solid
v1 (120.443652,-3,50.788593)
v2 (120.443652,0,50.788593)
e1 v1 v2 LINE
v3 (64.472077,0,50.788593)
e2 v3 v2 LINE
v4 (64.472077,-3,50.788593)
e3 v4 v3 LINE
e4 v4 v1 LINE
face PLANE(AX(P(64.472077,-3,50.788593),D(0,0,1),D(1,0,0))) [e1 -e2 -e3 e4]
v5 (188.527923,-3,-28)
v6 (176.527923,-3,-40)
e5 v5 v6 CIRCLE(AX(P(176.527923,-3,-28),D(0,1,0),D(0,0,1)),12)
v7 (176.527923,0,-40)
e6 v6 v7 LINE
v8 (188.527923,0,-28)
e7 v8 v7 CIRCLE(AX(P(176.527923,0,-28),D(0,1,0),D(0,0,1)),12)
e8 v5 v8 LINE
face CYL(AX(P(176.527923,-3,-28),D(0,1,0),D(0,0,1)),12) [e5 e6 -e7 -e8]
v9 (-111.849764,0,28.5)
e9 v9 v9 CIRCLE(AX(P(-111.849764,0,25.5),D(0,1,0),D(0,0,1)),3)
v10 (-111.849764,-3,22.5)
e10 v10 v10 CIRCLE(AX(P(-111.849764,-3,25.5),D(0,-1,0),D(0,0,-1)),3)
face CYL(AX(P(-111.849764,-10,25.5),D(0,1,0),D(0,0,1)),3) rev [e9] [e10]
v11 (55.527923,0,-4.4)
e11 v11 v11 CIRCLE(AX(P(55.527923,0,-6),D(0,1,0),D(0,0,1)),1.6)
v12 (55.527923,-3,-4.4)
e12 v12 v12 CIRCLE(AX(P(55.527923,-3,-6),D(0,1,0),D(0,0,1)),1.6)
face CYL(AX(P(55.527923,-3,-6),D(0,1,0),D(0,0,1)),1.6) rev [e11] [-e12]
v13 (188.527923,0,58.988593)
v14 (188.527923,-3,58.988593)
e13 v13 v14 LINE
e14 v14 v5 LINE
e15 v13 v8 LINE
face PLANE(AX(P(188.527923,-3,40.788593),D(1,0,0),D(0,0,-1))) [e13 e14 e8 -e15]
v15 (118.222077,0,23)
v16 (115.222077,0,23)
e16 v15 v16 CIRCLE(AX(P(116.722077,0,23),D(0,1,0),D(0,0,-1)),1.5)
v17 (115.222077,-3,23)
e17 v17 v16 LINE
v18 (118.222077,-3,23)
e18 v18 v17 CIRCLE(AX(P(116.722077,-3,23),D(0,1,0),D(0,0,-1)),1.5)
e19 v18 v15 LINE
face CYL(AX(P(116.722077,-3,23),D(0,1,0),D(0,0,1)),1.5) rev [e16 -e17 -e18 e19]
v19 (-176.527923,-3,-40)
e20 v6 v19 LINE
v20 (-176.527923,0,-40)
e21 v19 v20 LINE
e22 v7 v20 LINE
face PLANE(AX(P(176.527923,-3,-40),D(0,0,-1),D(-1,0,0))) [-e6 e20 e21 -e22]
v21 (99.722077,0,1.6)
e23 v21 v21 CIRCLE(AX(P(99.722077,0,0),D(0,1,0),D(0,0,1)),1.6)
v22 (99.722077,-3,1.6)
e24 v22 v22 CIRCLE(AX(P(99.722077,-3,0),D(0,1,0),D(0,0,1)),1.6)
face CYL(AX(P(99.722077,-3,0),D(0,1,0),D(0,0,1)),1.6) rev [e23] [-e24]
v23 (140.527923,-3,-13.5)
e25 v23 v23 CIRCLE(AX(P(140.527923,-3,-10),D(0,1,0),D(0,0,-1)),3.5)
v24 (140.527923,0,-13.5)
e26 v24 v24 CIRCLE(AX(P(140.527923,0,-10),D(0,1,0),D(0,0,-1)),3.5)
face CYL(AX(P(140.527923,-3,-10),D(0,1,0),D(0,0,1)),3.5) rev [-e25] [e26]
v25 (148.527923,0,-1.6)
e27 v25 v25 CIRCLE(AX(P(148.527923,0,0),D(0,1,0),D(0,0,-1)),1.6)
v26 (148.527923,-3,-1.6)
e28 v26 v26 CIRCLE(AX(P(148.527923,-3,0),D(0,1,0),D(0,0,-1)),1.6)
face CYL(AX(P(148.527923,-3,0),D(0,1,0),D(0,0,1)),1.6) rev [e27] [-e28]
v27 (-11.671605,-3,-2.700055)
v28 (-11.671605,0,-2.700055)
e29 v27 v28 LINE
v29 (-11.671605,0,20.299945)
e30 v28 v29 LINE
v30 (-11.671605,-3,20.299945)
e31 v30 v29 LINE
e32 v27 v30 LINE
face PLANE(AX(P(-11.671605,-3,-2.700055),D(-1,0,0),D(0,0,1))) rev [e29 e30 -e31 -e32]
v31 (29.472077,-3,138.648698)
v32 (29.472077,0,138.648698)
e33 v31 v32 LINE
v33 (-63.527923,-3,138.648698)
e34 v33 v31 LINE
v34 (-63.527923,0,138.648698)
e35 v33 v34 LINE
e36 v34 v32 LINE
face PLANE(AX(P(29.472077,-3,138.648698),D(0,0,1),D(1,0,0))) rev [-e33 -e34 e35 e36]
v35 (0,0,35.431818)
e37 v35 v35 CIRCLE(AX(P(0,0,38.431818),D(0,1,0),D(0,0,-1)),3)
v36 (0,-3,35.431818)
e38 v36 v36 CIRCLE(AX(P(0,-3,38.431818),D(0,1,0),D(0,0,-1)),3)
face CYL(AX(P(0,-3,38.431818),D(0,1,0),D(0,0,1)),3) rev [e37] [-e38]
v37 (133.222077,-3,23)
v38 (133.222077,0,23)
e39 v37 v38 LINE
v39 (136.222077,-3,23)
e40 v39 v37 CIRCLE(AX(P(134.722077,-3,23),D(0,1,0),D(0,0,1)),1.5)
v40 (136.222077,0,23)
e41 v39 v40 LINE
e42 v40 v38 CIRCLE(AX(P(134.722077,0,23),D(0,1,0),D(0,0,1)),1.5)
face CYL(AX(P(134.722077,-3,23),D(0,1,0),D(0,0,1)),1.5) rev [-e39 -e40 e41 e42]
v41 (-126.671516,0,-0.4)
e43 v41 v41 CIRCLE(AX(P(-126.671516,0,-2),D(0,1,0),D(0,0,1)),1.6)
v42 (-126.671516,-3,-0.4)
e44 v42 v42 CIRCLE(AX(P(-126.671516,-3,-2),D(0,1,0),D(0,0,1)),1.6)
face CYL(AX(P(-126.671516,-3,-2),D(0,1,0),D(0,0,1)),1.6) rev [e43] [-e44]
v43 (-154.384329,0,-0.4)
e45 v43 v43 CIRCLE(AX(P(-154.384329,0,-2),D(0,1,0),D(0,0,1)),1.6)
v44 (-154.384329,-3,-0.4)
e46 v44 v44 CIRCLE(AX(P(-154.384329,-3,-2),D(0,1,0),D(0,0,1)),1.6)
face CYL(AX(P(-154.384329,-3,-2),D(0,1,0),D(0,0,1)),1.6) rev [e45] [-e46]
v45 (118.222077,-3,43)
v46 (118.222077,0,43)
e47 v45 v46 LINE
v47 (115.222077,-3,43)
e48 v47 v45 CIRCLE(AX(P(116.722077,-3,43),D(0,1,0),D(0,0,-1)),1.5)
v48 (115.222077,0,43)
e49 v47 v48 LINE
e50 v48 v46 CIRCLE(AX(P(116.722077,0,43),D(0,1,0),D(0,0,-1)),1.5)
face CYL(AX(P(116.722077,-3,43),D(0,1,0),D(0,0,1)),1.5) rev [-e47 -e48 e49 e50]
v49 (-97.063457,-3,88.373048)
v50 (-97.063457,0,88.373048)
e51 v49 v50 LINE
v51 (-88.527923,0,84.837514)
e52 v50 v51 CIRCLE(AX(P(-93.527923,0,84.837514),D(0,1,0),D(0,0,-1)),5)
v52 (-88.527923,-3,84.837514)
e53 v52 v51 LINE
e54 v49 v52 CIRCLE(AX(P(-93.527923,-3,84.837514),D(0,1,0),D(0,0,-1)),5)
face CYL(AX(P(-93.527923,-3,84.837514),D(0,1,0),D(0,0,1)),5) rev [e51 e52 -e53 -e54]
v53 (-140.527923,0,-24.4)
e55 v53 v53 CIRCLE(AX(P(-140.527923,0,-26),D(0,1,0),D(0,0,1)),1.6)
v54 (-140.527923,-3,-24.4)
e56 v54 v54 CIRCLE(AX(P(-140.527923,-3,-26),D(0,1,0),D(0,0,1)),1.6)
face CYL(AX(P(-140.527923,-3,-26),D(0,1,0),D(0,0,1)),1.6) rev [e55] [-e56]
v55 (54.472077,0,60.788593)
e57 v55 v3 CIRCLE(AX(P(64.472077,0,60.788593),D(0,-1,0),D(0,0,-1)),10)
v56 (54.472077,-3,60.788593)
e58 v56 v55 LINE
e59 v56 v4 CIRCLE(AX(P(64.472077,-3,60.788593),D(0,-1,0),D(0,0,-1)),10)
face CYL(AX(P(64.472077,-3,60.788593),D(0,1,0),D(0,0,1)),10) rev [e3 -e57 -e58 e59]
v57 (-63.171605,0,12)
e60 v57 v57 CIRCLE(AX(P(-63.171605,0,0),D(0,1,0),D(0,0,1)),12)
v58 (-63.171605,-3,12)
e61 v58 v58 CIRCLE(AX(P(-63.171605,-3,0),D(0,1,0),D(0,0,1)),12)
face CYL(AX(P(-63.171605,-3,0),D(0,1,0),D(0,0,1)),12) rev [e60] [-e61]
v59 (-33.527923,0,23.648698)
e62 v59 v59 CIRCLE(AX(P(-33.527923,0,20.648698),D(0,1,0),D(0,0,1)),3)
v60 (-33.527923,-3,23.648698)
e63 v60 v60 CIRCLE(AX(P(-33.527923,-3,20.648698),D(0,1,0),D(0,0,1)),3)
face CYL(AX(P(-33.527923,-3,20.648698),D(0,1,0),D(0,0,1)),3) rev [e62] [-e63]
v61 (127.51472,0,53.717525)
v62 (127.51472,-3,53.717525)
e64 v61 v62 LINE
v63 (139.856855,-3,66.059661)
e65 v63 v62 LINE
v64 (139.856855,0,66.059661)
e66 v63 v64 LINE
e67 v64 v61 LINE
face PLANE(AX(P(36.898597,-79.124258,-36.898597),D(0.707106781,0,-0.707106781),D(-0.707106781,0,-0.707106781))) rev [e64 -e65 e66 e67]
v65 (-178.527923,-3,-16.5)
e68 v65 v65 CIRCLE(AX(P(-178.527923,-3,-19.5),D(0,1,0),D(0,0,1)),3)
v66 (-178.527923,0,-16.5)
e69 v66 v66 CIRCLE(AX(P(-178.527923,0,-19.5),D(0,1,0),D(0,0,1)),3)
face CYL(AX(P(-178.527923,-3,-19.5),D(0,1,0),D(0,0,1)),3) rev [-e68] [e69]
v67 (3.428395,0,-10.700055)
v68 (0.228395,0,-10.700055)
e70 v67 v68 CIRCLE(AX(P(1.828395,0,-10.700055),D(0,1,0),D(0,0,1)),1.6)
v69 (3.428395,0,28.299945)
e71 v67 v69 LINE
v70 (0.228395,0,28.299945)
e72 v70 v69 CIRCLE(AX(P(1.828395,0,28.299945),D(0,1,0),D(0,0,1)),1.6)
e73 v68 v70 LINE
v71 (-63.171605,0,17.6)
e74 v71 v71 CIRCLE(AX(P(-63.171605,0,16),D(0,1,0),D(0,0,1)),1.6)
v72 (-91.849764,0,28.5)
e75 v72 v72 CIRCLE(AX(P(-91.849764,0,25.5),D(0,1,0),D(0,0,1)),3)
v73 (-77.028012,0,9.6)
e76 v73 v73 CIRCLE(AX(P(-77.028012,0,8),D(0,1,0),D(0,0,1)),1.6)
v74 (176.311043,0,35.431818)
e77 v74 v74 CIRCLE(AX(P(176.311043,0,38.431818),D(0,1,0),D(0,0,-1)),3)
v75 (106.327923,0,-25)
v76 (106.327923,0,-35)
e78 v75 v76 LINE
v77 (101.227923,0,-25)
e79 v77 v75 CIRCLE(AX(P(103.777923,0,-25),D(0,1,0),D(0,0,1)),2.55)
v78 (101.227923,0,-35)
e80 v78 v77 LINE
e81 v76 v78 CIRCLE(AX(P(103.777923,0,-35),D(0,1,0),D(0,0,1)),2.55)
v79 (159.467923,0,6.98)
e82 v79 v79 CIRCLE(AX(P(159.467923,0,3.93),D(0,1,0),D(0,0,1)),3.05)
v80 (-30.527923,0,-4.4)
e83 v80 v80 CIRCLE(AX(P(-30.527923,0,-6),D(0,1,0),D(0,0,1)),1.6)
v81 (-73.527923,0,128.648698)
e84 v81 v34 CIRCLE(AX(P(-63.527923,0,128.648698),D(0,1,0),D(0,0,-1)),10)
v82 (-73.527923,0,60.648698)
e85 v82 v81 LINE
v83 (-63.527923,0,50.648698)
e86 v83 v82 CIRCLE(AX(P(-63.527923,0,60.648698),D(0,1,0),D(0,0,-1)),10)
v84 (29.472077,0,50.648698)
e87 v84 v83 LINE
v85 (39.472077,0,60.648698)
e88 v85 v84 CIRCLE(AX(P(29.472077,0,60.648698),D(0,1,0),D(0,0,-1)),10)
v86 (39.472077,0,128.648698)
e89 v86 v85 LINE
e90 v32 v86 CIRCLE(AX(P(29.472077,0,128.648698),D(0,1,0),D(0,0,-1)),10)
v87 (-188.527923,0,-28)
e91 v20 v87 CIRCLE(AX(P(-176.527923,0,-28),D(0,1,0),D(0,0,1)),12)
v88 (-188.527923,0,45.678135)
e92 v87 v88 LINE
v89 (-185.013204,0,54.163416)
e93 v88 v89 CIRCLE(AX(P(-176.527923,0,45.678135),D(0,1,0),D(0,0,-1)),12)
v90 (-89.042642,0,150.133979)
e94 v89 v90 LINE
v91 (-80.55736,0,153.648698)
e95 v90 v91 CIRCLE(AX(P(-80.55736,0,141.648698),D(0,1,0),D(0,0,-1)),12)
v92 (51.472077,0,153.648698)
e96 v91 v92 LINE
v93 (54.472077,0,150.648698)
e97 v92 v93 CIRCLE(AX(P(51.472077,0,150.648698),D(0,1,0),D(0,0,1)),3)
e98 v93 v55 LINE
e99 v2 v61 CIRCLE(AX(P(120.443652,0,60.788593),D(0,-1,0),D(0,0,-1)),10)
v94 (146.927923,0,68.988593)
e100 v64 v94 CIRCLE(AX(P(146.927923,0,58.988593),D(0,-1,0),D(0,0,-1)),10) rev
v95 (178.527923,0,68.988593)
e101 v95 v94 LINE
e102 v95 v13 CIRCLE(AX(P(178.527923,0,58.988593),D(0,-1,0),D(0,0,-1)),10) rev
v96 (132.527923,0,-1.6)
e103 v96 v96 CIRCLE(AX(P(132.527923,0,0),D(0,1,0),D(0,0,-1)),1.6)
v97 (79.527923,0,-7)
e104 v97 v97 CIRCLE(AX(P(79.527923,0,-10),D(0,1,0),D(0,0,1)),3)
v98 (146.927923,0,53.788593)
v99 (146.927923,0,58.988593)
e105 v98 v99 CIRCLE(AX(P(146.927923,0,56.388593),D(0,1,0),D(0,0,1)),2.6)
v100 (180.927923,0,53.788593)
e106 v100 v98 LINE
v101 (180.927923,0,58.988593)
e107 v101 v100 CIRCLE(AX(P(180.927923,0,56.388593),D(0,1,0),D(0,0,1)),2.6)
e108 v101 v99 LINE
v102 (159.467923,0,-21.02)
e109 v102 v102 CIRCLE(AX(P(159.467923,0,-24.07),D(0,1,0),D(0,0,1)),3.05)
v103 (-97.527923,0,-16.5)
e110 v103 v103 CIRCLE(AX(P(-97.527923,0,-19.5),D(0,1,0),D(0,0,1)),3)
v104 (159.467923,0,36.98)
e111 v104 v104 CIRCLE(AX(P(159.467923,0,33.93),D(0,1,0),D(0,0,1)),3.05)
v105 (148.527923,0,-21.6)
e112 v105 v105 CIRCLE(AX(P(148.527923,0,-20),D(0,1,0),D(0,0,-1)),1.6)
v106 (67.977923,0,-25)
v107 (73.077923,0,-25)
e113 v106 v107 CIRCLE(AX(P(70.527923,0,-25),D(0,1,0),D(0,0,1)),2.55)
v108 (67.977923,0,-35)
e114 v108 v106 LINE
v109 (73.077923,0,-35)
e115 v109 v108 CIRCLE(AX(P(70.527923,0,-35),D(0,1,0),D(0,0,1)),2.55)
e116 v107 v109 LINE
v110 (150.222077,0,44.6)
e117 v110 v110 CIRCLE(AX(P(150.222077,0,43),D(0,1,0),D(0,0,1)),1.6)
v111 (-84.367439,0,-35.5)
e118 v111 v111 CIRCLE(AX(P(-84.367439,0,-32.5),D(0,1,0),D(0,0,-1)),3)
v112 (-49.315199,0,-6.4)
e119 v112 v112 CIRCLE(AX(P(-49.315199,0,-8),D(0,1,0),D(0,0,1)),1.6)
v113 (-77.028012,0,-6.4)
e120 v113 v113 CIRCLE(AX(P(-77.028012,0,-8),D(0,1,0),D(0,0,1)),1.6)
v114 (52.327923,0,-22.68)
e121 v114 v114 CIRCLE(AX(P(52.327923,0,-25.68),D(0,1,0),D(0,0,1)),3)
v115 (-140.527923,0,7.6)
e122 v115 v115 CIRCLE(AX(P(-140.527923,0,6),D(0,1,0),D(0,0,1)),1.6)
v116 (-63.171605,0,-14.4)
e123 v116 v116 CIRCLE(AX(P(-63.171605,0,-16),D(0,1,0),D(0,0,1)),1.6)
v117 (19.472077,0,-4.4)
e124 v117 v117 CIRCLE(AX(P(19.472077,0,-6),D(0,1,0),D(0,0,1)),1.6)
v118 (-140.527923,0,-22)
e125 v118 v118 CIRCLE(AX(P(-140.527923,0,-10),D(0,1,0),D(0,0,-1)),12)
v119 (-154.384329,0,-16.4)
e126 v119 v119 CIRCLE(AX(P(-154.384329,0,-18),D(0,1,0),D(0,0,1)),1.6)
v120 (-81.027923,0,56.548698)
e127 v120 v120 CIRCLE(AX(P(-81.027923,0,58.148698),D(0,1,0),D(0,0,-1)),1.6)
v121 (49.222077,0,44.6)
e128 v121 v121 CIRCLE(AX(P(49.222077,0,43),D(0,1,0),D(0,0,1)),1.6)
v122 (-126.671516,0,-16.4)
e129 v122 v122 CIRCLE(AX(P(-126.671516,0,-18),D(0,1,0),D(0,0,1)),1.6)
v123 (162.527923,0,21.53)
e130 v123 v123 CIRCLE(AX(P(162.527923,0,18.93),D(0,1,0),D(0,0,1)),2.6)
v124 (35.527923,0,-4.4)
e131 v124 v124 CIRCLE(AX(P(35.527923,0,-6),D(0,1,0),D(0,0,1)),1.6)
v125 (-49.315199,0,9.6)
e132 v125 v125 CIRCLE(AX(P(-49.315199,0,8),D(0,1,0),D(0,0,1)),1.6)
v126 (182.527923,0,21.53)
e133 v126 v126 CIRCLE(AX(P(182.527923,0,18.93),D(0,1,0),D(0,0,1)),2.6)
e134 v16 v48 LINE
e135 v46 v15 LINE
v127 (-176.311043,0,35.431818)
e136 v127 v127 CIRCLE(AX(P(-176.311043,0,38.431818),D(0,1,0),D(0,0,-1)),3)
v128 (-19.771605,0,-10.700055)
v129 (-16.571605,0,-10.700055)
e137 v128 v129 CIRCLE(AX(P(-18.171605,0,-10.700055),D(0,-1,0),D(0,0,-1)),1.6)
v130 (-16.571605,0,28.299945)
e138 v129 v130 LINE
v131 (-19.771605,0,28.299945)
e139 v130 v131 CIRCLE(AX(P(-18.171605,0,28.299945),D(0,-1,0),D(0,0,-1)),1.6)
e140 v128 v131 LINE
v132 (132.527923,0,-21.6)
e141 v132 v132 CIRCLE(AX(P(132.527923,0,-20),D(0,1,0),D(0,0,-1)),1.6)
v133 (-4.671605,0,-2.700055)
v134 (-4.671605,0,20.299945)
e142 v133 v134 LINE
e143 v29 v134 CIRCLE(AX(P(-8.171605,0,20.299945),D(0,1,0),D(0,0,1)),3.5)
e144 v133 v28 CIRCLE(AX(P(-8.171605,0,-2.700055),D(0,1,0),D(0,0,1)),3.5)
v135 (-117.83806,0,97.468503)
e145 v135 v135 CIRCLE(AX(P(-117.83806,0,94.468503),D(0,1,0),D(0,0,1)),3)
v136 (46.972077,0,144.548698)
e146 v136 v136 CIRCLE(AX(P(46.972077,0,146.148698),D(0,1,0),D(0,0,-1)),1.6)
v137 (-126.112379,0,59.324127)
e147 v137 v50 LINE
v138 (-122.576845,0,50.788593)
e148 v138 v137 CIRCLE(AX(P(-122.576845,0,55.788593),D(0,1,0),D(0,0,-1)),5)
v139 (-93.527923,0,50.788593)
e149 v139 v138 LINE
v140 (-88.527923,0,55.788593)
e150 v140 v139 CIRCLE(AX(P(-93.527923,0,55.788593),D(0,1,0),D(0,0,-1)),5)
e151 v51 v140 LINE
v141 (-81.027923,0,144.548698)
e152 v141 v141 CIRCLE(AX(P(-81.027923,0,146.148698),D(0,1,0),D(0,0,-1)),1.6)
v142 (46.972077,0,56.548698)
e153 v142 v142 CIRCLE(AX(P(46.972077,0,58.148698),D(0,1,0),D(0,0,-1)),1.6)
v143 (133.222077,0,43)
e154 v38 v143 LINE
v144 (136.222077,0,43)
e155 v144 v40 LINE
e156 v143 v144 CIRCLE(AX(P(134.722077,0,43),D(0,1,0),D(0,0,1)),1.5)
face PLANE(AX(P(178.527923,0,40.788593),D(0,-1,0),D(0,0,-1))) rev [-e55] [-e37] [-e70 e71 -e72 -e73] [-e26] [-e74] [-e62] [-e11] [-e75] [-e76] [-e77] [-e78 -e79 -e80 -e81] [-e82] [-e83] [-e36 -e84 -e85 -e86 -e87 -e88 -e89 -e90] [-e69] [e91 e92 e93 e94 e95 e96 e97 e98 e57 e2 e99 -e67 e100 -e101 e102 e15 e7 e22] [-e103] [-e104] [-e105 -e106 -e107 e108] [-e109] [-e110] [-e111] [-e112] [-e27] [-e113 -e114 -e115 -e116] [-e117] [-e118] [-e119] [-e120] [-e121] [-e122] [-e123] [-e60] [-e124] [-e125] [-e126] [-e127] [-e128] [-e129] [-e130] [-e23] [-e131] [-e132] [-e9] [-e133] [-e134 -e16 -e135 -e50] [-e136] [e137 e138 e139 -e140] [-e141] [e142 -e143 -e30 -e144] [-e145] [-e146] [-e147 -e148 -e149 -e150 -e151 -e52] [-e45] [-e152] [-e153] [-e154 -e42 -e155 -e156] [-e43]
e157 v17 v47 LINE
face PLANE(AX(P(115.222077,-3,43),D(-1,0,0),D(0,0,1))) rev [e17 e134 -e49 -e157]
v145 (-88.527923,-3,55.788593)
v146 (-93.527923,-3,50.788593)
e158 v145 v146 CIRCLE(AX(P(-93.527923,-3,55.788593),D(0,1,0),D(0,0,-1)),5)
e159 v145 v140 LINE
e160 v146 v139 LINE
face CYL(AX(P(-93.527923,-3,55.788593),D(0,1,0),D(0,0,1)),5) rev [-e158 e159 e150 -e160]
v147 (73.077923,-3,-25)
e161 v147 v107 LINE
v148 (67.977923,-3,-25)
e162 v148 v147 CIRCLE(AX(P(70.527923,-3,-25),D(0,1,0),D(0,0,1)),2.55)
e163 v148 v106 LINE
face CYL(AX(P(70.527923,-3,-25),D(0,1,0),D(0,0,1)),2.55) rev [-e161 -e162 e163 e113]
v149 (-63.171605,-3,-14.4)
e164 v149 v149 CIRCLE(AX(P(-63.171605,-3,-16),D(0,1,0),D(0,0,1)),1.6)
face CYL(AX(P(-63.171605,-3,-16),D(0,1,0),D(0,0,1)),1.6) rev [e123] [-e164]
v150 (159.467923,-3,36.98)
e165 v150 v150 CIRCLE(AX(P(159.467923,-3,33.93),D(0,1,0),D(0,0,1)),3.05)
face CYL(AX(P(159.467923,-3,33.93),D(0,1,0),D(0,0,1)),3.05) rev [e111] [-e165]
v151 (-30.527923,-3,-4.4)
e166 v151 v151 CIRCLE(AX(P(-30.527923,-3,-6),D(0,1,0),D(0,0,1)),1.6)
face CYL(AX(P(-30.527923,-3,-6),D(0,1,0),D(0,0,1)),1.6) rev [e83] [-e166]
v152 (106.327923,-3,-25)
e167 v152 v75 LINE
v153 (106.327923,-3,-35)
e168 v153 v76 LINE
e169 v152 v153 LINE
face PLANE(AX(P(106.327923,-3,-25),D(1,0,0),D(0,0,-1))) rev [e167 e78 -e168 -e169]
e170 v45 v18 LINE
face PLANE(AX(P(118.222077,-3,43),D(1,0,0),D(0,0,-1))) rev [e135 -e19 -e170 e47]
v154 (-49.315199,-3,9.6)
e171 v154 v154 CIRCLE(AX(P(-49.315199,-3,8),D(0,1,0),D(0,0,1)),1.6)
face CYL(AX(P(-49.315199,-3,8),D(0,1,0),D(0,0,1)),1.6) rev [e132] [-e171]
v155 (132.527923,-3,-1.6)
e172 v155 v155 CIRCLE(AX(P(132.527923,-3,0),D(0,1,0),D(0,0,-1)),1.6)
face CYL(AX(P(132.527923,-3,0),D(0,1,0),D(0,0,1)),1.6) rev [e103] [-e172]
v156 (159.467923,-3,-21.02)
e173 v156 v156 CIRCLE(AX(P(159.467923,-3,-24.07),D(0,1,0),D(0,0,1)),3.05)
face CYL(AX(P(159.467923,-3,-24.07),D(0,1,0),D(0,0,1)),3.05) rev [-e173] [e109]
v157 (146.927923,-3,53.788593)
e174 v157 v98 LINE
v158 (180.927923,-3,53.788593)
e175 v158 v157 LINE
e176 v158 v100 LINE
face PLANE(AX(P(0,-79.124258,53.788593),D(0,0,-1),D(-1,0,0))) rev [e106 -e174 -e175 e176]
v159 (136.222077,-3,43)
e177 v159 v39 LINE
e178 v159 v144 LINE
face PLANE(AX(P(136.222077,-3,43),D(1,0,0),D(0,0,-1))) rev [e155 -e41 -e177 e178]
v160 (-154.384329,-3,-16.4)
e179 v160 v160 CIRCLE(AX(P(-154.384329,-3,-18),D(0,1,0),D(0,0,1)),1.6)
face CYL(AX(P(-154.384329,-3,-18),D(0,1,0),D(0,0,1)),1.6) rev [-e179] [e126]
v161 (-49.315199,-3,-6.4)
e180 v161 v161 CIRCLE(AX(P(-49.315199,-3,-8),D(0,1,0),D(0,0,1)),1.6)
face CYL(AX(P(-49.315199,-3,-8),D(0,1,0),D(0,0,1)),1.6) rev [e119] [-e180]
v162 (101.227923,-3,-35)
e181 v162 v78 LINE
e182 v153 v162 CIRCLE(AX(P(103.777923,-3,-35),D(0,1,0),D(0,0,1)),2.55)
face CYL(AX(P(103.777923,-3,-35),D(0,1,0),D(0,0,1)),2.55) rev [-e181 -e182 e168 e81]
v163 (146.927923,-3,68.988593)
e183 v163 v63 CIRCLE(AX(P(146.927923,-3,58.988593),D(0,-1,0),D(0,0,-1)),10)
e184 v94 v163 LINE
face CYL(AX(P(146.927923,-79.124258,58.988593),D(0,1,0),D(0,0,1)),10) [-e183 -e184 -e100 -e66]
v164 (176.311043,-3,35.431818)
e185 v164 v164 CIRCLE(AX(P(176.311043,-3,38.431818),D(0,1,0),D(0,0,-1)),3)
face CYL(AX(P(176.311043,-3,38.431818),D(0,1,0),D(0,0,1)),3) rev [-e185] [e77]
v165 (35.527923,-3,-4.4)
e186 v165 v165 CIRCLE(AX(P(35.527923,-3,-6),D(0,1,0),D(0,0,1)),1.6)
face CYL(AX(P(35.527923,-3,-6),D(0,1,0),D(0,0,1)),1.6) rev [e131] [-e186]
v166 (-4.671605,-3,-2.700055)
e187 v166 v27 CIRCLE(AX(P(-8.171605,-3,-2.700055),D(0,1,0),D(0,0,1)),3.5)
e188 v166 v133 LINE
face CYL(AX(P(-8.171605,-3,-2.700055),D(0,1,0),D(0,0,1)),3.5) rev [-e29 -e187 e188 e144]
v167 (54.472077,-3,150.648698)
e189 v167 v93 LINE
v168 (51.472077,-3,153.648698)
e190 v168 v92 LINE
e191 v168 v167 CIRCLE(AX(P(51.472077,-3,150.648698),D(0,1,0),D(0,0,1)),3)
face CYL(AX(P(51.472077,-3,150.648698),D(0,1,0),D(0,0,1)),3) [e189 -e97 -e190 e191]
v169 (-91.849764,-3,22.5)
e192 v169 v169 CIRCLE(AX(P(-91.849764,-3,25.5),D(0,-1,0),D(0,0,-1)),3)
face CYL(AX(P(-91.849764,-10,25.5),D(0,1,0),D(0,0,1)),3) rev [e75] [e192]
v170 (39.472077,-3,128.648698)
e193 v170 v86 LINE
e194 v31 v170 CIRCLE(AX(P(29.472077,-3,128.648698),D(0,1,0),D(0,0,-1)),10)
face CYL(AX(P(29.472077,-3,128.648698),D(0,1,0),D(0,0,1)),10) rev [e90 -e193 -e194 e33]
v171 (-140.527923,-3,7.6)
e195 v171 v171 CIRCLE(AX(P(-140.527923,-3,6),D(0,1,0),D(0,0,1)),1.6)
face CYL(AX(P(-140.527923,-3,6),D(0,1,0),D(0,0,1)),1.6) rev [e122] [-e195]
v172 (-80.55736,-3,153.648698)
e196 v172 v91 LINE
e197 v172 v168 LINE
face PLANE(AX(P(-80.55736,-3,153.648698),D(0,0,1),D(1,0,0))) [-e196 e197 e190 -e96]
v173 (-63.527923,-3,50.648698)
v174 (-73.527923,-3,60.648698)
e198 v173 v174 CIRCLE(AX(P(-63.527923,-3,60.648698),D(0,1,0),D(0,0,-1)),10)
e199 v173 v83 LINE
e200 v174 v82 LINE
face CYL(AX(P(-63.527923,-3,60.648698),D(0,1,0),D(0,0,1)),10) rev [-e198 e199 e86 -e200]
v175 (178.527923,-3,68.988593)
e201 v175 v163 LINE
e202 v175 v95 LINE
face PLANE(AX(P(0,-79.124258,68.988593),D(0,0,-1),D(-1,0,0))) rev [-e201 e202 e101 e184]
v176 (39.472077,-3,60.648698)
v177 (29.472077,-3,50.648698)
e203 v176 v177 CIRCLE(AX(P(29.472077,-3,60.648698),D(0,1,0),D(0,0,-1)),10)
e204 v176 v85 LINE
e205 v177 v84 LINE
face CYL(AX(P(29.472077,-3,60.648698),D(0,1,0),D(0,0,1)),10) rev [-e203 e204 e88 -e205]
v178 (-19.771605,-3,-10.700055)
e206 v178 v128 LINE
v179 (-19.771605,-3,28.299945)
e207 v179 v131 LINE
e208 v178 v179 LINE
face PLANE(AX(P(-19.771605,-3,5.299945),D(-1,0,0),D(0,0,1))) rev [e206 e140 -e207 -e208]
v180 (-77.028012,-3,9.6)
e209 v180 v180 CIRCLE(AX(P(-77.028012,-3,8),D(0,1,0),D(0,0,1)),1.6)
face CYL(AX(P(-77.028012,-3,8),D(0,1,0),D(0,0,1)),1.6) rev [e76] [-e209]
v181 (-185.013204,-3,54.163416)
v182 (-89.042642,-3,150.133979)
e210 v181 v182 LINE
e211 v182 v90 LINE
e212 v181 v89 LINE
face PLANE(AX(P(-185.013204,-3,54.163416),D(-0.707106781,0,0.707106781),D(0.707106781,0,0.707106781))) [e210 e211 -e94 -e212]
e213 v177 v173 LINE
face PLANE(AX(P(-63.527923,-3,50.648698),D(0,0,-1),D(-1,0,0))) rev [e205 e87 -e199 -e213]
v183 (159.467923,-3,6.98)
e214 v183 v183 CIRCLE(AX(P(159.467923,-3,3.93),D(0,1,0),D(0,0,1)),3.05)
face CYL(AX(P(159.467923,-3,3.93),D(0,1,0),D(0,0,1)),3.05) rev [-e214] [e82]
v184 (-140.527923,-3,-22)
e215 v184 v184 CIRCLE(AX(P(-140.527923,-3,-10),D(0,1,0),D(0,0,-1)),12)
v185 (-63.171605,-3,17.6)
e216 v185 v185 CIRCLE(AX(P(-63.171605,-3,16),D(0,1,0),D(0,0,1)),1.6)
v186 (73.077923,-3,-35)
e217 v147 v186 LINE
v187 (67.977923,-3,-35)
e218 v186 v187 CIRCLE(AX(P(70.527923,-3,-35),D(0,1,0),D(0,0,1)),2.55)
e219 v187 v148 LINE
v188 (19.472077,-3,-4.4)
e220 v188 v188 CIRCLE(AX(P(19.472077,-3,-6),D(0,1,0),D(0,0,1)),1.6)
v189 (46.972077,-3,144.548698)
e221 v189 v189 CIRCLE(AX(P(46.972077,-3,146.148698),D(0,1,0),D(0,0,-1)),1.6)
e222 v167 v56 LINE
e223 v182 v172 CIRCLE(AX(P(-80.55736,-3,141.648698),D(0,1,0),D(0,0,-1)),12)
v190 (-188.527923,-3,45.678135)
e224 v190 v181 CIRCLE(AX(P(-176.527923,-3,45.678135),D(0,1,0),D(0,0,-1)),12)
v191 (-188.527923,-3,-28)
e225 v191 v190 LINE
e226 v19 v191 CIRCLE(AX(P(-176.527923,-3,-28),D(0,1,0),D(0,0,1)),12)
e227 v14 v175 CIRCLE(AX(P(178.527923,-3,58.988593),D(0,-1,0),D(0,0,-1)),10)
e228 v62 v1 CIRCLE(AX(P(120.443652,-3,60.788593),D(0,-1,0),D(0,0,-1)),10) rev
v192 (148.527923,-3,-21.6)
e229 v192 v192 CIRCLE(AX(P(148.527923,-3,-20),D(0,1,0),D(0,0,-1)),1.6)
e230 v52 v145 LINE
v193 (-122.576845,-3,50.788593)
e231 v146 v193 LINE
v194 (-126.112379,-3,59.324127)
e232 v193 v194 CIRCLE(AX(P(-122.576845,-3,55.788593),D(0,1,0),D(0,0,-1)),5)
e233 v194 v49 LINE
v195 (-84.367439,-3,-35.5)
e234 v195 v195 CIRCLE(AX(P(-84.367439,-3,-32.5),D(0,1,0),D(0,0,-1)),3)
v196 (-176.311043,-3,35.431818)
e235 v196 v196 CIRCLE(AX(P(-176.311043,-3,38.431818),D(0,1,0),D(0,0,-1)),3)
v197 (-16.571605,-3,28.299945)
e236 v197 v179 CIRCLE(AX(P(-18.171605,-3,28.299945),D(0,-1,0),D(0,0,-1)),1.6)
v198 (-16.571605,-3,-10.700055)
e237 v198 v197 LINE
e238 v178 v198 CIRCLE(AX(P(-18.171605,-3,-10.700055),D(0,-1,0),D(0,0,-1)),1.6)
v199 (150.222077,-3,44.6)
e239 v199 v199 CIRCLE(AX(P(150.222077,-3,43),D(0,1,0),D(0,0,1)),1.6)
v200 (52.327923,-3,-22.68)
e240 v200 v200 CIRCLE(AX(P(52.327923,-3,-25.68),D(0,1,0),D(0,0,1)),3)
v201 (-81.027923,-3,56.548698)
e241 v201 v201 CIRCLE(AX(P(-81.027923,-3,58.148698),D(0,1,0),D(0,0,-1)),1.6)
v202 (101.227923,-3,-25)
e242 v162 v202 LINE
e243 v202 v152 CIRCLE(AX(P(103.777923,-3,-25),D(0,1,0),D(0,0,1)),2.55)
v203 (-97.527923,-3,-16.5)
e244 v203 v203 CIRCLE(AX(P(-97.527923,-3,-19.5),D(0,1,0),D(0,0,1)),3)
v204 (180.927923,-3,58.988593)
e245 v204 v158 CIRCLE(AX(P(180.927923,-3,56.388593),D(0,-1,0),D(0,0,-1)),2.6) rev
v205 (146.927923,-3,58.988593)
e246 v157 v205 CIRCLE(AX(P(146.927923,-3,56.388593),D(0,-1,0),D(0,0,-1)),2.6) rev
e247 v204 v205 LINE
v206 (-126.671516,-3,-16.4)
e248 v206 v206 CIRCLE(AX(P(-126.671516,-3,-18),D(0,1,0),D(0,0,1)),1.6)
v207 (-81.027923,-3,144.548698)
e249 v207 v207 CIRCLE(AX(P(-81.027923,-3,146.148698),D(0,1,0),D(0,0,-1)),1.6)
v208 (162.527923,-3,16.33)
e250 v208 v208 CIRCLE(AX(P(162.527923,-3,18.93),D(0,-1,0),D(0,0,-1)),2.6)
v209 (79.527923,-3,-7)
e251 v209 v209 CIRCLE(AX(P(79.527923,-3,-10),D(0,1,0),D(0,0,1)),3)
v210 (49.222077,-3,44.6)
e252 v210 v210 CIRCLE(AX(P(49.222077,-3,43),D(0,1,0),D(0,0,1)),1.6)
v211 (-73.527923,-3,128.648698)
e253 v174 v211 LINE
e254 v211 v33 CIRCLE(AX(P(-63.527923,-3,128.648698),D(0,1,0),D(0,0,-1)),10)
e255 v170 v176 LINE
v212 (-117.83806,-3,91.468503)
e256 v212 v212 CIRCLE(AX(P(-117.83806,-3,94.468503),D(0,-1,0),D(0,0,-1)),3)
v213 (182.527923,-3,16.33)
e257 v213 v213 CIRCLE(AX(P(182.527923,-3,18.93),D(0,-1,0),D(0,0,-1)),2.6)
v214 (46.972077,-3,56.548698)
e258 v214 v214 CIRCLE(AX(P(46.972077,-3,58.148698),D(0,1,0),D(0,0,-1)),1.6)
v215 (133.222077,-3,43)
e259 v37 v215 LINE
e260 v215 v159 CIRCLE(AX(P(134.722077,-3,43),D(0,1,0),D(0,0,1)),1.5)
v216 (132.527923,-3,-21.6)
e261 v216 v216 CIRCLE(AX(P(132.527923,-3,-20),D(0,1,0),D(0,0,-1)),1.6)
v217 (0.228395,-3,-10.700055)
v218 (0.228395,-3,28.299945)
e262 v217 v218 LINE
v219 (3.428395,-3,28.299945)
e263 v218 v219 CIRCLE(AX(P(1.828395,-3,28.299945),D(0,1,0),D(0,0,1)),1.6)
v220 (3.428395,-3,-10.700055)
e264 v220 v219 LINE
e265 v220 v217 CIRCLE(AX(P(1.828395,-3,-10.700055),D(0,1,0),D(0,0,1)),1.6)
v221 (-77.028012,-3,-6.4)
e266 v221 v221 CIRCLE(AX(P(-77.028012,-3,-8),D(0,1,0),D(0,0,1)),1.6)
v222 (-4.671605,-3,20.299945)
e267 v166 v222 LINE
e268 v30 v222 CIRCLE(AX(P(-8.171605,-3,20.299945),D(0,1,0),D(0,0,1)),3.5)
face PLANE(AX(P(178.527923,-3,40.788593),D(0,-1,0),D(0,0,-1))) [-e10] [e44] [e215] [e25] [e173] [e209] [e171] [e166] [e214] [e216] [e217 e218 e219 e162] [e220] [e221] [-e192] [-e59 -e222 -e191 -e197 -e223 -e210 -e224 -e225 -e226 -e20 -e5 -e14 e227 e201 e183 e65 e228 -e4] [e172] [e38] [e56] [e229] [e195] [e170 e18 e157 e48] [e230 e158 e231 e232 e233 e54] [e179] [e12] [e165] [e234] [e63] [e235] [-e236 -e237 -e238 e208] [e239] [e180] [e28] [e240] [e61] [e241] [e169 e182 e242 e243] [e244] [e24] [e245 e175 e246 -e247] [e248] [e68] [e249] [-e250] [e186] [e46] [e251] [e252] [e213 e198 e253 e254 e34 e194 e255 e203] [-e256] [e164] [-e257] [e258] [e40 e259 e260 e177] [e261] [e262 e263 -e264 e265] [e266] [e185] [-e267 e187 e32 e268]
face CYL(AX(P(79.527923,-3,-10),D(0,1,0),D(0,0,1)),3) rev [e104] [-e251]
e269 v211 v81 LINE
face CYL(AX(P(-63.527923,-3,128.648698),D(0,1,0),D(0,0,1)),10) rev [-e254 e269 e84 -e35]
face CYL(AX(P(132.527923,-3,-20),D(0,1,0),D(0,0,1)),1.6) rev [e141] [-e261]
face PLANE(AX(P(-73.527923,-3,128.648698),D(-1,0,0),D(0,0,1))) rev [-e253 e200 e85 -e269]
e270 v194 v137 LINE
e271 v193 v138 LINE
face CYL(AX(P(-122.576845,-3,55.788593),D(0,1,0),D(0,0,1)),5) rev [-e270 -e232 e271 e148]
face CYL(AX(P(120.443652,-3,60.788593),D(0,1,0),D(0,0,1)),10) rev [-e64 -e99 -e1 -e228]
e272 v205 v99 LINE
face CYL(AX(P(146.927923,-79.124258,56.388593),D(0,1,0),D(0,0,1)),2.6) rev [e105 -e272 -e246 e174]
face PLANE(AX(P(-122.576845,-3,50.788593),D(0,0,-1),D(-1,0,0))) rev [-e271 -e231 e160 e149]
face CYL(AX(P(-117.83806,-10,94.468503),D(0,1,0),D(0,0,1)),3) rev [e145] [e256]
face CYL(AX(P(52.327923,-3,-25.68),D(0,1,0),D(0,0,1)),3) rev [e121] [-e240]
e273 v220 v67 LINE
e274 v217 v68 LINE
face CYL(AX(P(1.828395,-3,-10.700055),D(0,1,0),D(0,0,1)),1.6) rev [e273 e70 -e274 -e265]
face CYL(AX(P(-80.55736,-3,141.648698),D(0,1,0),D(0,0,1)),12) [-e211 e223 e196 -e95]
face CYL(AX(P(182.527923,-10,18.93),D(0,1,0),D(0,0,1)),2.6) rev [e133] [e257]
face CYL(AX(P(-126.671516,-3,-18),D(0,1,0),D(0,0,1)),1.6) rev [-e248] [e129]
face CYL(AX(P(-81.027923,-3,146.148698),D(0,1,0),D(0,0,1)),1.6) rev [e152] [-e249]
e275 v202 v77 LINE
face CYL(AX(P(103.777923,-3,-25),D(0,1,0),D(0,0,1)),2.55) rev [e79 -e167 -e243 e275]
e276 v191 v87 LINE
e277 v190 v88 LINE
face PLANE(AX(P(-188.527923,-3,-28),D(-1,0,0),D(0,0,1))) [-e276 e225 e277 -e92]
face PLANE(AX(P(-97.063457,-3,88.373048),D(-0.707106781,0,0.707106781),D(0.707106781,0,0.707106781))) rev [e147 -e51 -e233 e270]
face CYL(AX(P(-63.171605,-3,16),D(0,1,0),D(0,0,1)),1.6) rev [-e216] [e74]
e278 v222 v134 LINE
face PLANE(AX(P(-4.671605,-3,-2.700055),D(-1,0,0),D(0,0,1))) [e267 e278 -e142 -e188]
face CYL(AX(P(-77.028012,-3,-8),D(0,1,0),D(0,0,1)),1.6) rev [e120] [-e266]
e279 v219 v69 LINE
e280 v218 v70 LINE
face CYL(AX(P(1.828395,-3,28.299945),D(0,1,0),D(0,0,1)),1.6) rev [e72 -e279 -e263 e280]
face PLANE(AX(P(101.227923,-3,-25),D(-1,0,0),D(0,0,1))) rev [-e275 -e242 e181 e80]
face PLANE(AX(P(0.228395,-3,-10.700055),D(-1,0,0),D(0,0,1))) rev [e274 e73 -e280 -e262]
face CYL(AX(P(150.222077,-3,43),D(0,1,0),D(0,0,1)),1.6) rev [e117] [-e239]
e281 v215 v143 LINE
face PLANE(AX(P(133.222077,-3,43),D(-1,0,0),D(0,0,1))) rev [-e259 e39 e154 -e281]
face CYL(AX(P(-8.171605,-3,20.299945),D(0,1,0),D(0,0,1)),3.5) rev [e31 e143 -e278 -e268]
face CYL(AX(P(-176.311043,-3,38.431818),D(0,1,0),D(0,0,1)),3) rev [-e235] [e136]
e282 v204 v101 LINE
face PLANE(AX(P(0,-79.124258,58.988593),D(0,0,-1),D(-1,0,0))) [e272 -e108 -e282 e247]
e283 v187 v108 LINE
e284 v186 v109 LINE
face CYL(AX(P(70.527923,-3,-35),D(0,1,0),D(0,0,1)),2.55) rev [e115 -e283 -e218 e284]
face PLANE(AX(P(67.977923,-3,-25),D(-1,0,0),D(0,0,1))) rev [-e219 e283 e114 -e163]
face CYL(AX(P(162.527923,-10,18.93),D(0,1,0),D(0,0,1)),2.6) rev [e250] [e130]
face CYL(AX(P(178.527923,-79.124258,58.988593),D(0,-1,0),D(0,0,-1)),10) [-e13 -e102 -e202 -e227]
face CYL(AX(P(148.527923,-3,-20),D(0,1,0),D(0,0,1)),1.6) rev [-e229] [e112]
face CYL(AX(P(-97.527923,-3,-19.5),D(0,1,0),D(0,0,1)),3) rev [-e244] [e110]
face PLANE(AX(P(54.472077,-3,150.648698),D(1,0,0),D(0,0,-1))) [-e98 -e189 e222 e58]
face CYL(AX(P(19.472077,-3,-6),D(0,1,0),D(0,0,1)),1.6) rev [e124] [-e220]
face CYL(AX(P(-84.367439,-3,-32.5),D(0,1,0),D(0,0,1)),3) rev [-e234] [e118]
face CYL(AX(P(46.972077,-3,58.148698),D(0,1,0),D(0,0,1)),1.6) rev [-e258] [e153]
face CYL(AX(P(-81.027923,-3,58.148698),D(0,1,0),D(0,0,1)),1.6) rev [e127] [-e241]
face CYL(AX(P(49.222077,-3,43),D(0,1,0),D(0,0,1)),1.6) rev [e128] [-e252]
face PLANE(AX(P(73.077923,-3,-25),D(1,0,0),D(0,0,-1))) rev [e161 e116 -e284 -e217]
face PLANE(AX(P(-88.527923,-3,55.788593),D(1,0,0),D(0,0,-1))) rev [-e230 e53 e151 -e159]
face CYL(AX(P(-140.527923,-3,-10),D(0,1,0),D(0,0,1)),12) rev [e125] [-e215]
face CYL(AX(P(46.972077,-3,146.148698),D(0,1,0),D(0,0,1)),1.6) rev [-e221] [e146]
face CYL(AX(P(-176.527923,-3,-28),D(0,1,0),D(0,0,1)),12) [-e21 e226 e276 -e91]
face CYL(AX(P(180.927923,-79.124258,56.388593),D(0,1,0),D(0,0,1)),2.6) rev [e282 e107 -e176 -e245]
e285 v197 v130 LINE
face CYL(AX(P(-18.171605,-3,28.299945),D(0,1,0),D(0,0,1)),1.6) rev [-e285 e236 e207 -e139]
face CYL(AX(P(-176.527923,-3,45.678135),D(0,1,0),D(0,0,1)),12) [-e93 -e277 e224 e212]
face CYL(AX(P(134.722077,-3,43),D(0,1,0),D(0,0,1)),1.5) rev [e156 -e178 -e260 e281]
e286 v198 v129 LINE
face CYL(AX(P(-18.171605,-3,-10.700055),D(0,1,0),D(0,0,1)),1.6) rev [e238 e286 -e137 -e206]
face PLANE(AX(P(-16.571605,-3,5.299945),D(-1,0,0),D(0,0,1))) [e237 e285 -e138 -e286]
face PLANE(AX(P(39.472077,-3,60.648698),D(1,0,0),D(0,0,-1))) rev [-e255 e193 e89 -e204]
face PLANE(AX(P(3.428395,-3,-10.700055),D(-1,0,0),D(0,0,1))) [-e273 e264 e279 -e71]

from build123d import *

# Parameters (mm, degrees)
ESBO_O1_R                = 1.6
ESBO_O1_R_2              = 3
ESBO_O1_R_3              = 12
ESBO_O1_R_4              = 3.5
ESBO_O1_R_5              = 3.05
RESSALTO_EXTRUS_O1_DEPTH = 3
ESBO_O2_R                = 3
ESBO_O2_R_2              = 2.6
CORTE_EXTRUS_O1_DEPTH    = 10
RESSALTO_EXTRUS_O2_START = -3
RESSALTO_EXTRUS_O2_DEPTH = 3
FILETE1_R                = 10
CORTE_EXTRUS_O2_DEPTH    = 244.227671166


# Read off the part's stored shape, not the designer's step: Ressalto-extrusão2
with BuildPart() as part:
    # Esboço1 → Ressalto-extrusão1 (new body)
    with BuildSketch(Plane(origin=(0, 0, 0), x_dir=(1, 0, 0), z_dir=(0, 1, 0))):
        with BuildLine():
            Line((-80.557360207, -153.648697641), (51.472077044, -153.648697641))
            ThreePointArc((51.472077044, -153.648697641), (53.593397388, -152.770017984), (54.472077044, -150.648697641))
            Line((54.472077044, -150.648697641), (54.472077044, -60.788592817))
            ThreePointArc((54.472077044, -60.788592817), (57.401009232, -53.717525005), (64.472077044, -50.788592817))
            Line((64.472077044, -50.788592817), (178.527922956, -50.788592817))
            ThreePointArc((178.527922956, -50.788592817), (185.598990768, -47.859660628), (188.527922956, -40.788592817))
            Line((188.527922956, -40.788592817), (188.527922956, 28))
            ThreePointArc((188.527922956, 28), (185.01320433, 36.485281374), (176.527922956, 40))
            Line((176.527922956, 40), (-176.527922956, 40))
            ThreePointArc((-176.527922956, 40), (-185.01320433, 36.485281374), (-188.527922956, 28))
            Line((-188.527922956, 28), (-188.527922956, -45.678134892))
            ThreePointArc((-188.527922956, -45.678134892), (-187.614477346, -50.270336081), (-185.01320433, -54.163416267))
            Line((-185.01320433, -54.163416267), (-89.042641582, -150.133979015))
            ThreePointArc((-89.042641582, -150.133979015), (-85.149561396, -152.735252031), (-80.557360207, -153.648697641))
        make_face()
        with Locations(Location((-81.027922956, -58.148697641, 0), (0, 0, 90))):
            Circle(ESBO_O1_R, mode=Mode.SUBTRACT)
        with Locations(Location((-81.027922956, -146.148697641, 0), (0, 0, 90))):
            Circle(ESBO_O1_R, mode=Mode.SUBTRACT)
        with Locations(Location((46.972077044, -58.148697641, 0), (0, 0, 90))):
            Circle(ESBO_O1_R, mode=Mode.SUBTRACT)
        with Locations(Location((46.972077044, -146.148697641, 0), (0, 0, 90))):
            Circle(ESBO_O1_R, mode=Mode.SUBTRACT)
        with Locations(Location((176.311042956, -38.431817641, 0), (0, 0, 90))):
            Circle(ESBO_O1_R_2, mode=Mode.SUBTRACT)
        with Locations(Location((0, -38.431817641, 0), (0, 0, 90))):
            Circle(ESBO_O1_R_2, mode=Mode.SUBTRACT)
        with Locations(Location((-140.527922956, 10, 0), (0, 0, 90))):
            Circle(ESBO_O1_R_3, mode=Mode.SUBTRACT)
        with Locations(Location((-140.527922956, -6, 0), (0, 0, 270))):
            Circle(ESBO_O1_R, mode=Mode.SUBTRACT)
        with Locations(Location((-154.384329416, 2, 0), (0, 0, 270))):
            Circle(ESBO_O1_R, mode=Mode.SUBTRACT)
        with Locations(Location((-154.384329416, 18, 0), (0, 0, 270))):
            Circle(ESBO_O1_R, mode=Mode.SUBTRACT)
        with Locations(Location((-84.367438628, 32.5, 0), (0, 0, 90))):
            Circle(ESBO_O1_R_2, mode=Mode.SUBTRACT)
        with Locations(Location((-176.311042956, -38.431817641, 0), (0, 0, 90))):
            Circle(ESBO_O1_R_2, mode=Mode.SUBTRACT)
        with Locations(Location((140.527922956, 10, 0), (0, 0, 90))):
            Circle(ESBO_O1_R_4, mode=Mode.SUBTRACT)
        with Locations(Location((148.527922956, 0, 0), (0, 0, 90))):
            Circle(ESBO_O1_R, mode=Mode.SUBTRACT)
        with Locations(Location((148.527922956, 20, 0), (0, 0, 90))):
            Circle(ESBO_O1_R, mode=Mode.SUBTRACT)
        with Locations(Location((132.527922956, 0, 0), (0, 0, 90))):
            Circle(ESBO_O1_R, mode=Mode.SUBTRACT)
        with Locations(Location((132.527922956, 20, 0), (0, 0, 90))):
            Circle(ESBO_O1_R, mode=Mode.SUBTRACT)
        with Locations(Location((-140.527922956, 26, 0), (0, 0, 270))):
            Circle(ESBO_O1_R, mode=Mode.SUBTRACT)
        with Locations(Location((-126.671516495, 18, 0), (0, 0, 270))):
            Circle(ESBO_O1_R, mode=Mode.SUBTRACT)
        with Locations(Location((-126.671516495, 2, 0), (0, 0, 270))):
            Circle(ESBO_O1_R, mode=Mode.SUBTRACT)
        with Locations(Location((-63.17160518, -16, 0), (0, 0, 270))):
            Circle(ESBO_O1_R, mode=Mode.SUBTRACT)
        with Locations(Location((-77.02801164, -8, 0), (0, 0, 270))):
            Circle(ESBO_O1_R, mode=Mode.SUBTRACT)
        with Locations(Location((-77.02801164, 8, 0), (0, 0, 270))):
            Circle(ESBO_O1_R, mode=Mode.SUBTRACT)
        with Locations(Location((-63.17160518, 16, 0), (0, 0, 270))):
            Circle(ESBO_O1_R, mode=Mode.SUBTRACT)
        with Locations(Location((-49.315198719, 8, 0), (0, 0, 270))):
            Circle(ESBO_O1_R, mode=Mode.SUBTRACT)
        with Locations(Location((-49.315198719, -8, 0), (0, 0, 270))):
            Circle(ESBO_O1_R, mode=Mode.SUBTRACT)
        with Locations(Location((-63.17160518, 0, 0), (0, 0, 270))):
            Circle(ESBO_O1_R_3, mode=Mode.SUBTRACT)
        with Locations(Location((-33.527922956, -20.648697641, 0), (0, 0, 270))):
            Circle(ESBO_O1_R_2, mode=Mode.SUBTRACT)
        with Locations(Location((79.527922956, 10, 0), (0, 0, 270))):
            Circle(ESBO_O1_R_2, mode=Mode.SUBTRACT)
        with Locations(Location((99.722077044, 0, 0), (0, 0, 270))):
            Circle(ESBO_O1_R, mode=Mode.SUBTRACT)
        with Locations(Location((49.222077044, -43, 0), (0, 0, 270))):
            Circle(ESBO_O1_R, mode=Mode.SUBTRACT)
        with Locations(Location((-30.527922956, 6, 0), (0, 0, 270))):
            Circle(ESBO_O1_R, mode=Mode.SUBTRACT)
        with Locations(Location((19.472077044, 6, 0), (0, 0, 270))):
            Circle(ESBO_O1_R, mode=Mode.SUBTRACT)
        with Locations(Location((55.527922956, 6, 0), (0, 0, 270))):
            Circle(ESBO_O1_R, mode=Mode.SUBTRACT)
        with Locations(Location((35.527922956, 6, 0), (0, 0, 270))):
            Circle(ESBO_O1_R, mode=Mode.SUBTRACT)
        with Locations(Location((159.467922956, 24.07, 0), (0, 0, 270))):
            Circle(ESBO_O1_R_5, mode=Mode.SUBTRACT)
        with Locations(Location((159.467922956, -3.93, 0), (0, 0, 270))):
            Circle(ESBO_O1_R_5, mode=Mode.SUBTRACT)
        with Locations(Location((159.467922956, -33.93, 0), (0, 0, 270))):
            Circle(ESBO_O1_R_5, mode=Mode.SUBTRACT)
        with Locations(Location((-178.527922956, 19.5, 0), (0, 0, 270))):
            Circle(ESBO_O1_R_2, mode=Mode.SUBTRACT)
        with Locations(Location((-97.527922956, 19.5, 0), (0, 0, 270))):
            Circle(ESBO_O1_R_2, mode=Mode.SUBTRACT)
        with Locations(Location((52.327922956, 25.68, 0), (0, 0, 270))):
            Circle(ESBO_O1_R_2, mode=Mode.SUBTRACT)
        with Locations(Location((150.222077044, -43, 0), (0, 0, 270))):
            Circle(ESBO_O1_R, mode=Mode.SUBTRACT)
        with BuildLine():
            Line((-122.576844598, -50.788592817), (-93.527922956, -50.788592817))
            ThreePointArc((-93.527922956, -50.788592817), (-89.99238905, -52.253058911), (-88.527922956, -55.788592817))
            Line((-88.527922956, -55.788592817), (-88.527922956, -84.837514459))
            ThreePointArc((-88.527922956, -84.837514459), (-91.614505794, -89.456912121), (-97.063456862, -88.373048365))
            Line((-97.063456862, -88.373048365), (-126.112378504, -59.324126723))
            ThreePointArc((-126.112378504, -59.324126723), (-127.196242261, -53.875175655), (-122.576844598, -50.788592817))
        make_face(mode=Mode.SUBTRACT)
        with BuildLine():
            Line((39.472077044, -60.648697641), (39.472077044, -128.648697641))
            ThreePointArc((39.472077044, -128.648697641), (36.543144856, -135.719765453), (29.472077044, -138.648697641))
            Line((29.472077044, -138.648697641), (-63.527922956, -138.648697641))
            ThreePointArc((-63.527922956, -138.648697641), (-70.598990768, -135.719765453), (-73.527922956, -128.648697641))
            Line((-73.527922956, -128.648697641), (-73.527922956, -60.648697641))
            ThreePointArc((-73.527922956, -60.648697641), (-70.598990768, -53.577629829), (-63.527922956, -50.648697641))
            Line((-63.527922956, -50.648697641), (29.472077044, -50.648697641))
            ThreePointArc((29.472077044, -50.648697641), (36.543144856, -53.577629829), (39.472077044, -60.648697641))
        make_face(mode=Mode.SUBTRACT)
        with BuildLine():
            Line((133.222077044, -43), (133.222077044, -23))
            ThreePointArc((133.222077044, -23), (134.722077044, -21.5), (136.222077044, -23))
            Line((136.222077044, -23), (136.222077044, -43))
            ThreePointArc((136.222077044, -43), (134.722077044, -44.5), (133.222077044, -43))
        make_face(mode=Mode.SUBTRACT)
        with BuildLine():
            Line((118.222077044, -43), (118.222077044, -23))
            ThreePointArc((118.222077044, -23), (116.722077044, -21.5), (115.222077044, -23))
            Line((115.222077044, -23), (115.222077044, -43))
            ThreePointArc((115.222077044, -43), (116.722077044, -44.5), (118.222077044, -43))
        make_face(mode=Mode.SUBTRACT)
        with BuildLine():
            Line((67.977922956, 25), (67.977922956, 35))
            ThreePointArc((67.977922956, 35), (70.527922956, 37.55), (73.077922956, 35))
            Line((73.077922956, 35), (73.077922956, 25))
            ThreePointArc((73.077922956, 25), (70.527922956, 22.45), (67.977922956, 25))
        make_face(mode=Mode.SUBTRACT)
        with BuildLine():
            Line((101.227922956, 25), (101.227922956, 35))
            ThreePointArc((101.227922956, 35), (103.777922956, 37.55), (106.327922956, 35))
            Line((106.327922956, 35), (106.327922956, 25))
            ThreePointArc((106.327922956, 25), (103.777922956, 22.45), (101.227922956, 25))
        make_face(mode=Mode.SUBTRACT)
    extrude(amount=-RESSALTO_EXTRUS_O1_DEPTH)

    # Esboço2 → Corte-extrusão1 (cut)
    with BuildSketch(Plane(origin=(0, 0, 0), x_dir=(1, 0, 0), z_dir=(0, 1, 0))):
        with Locations(Location((-117.838060117, -94.468502794, 0), (0, 0, 270))):
            Circle(ESBO_O2_R)
        with Locations(Location((182.527922956, -18.93, 0), (0, 0, 270))):
            Circle(ESBO_O2_R_2)
        with Locations(Location((162.527922956, -18.93, 0), (0, 0, 270))):
            Circle(ESBO_O2_R_2)
        with Locations(Location((-111.849764068, -25.5, 0), (0, 0, 270))):
            Circle(ESBO_O2_R)
        with Locations(Location((-91.849764068, -25.5, 0), (0, 0, 270))):
            Circle(ESBO_O2_R)
    extrude(amount=-CORTE_EXTRUS_O1_DEPTH, mode=Mode.SUBTRACT)

    # Ressalto-extrusão2 outline → Ressalto-extrusão2 (add)
    with BuildSketch(Plane(origin=(0, 0, 0), x_dir=(1, 0, 0), z_dir=(0, 1, 0)).offset(RESSALTO_EXTRUS_O2_START)):
        with BuildLine():
            Line((142.785787332, -68.988592817), (188.527922956, -68.988592817))
            Line((188.527922956, -68.988592817), (188.527922956, -40.788592817))
            ThreePointArc((188.527922956, -40.788592817), (185.598990767, -47.859660628), (178.527922956, -50.788592817))
            Line((178.527922956, -50.788592817), (124.585787332, -50.788592817))
            Line((124.585787332, -50.788592817), (142.785787332, -68.988592817))
        make_face()
        with BuildLine():
            ThreePointArc((146.927922956, -58.988592817), (144.327922956, -56.388592817), (146.927922956, -53.788592817))
            Line((146.927922956, -53.788592817), (180.927922956, -53.788592817))
            ThreePointArc((180.927922956, -53.788592817), (183.527922956, -56.388592817), (180.927922956, -58.988592817))
            Line((180.927922956, -58.988592817), (146.927922956, -58.988592817))
        make_face(mode=Mode.SUBTRACT)
    extrude(amount=RESSALTO_EXTRUS_O2_DEPTH)

    # Filete1
    filete1_edges = [part.edges().sort_by_distance(p)[0] for p in [
        (124.585787332, -1.5, 50.788592817),
        (188.527922956, -1.5, 68.988592817),
        (142.785787332, -1.5, 68.988592817),
    ]]
    fillet(filete1_edges, radius=FILETE1_R)

    # Esboço4 → Corte-extrusão2 (cut, through all)
    with BuildSketch(Plane(origin=(0, 0, 0), x_dir=(1, 0, 0), z_dir=(0, 1, 0))):
        with BuildLine():
            Line((-4.67160518, 2.700055346), (-4.67160518, -20.299944654))
            ThreePointArc((-4.67160518, -20.299944654), (-8.17160518, -23.799944654), (-11.67160518, -20.299944654))
            Line((-11.67160518, -20.299944654), (-11.67160518, 2.700055346))
            ThreePointArc((-11.67160518, 2.700055346), (-8.17160518, 6.200055346), (-4.67160518, 2.700055346))
        make_face()
        with BuildLine():
            Line((3.42839482, 10.700055346), (3.42839482, -12.299944654))
            ThreePointArc((3.42839482, -12.299944654), (1.82839482, -13.899944654), (0.22839482, -12.299944654))
            Line((0.22839482, -12.299944654), (0.22839482, 10.700055346))
            ThreePointArc((0.22839482, 10.700055346), (1.82839482, 12.300055346), (3.42839482, 10.700055346))
        make_face()
        with BuildLine():
            Line((3.42839482, -5.299944654), (3.42839482, -28.299944654))
            ThreePointArc((3.42839482, -28.299944654), (1.82839482, -29.899944654), (0.22839482, -28.299944654))
            Line((0.22839482, -28.299944654), (0.22839482, -5.299944654))
            ThreePointArc((0.22839482, -5.299944654), (1.82839482, -3.699944654), (3.42839482, -5.299944654))
        make_face()
        with BuildLine():
            Line((-19.77160518, -5.299944654), (-19.77160518, -28.299944654))
            ThreePointArc((-19.77160518, -28.299944654), (-18.17160518, -29.899944654), (-16.57160518, -28.299944654))
            Line((-16.57160518, -28.299944654), (-16.57160518, -5.299944654))
            ThreePointArc((-16.57160518, -5.299944654), (-18.17160518, -3.699944654), (-19.77160518, -5.299944654))
        make_face()
        with BuildLine():
            Line((-19.77160518, 10.700055346), (-19.77160518, -12.299944654))
            ThreePointArc((-19.77160518, -12.299944654), (-18.17160518, -13.899944654), (-16.57160518, -12.299944654))
            Line((-16.57160518, -12.299944654), (-16.57160518, 10.700055346))
            ThreePointArc((-16.57160518, 10.700055346), (-18.17160518, 12.300055346), (-19.77160518, 10.700055346))
        make_face()
    extrude(amount=-CORTE_EXTRUS_O2_DEPTH, mode=Mode.SUBTRACT)


solid = part.part
